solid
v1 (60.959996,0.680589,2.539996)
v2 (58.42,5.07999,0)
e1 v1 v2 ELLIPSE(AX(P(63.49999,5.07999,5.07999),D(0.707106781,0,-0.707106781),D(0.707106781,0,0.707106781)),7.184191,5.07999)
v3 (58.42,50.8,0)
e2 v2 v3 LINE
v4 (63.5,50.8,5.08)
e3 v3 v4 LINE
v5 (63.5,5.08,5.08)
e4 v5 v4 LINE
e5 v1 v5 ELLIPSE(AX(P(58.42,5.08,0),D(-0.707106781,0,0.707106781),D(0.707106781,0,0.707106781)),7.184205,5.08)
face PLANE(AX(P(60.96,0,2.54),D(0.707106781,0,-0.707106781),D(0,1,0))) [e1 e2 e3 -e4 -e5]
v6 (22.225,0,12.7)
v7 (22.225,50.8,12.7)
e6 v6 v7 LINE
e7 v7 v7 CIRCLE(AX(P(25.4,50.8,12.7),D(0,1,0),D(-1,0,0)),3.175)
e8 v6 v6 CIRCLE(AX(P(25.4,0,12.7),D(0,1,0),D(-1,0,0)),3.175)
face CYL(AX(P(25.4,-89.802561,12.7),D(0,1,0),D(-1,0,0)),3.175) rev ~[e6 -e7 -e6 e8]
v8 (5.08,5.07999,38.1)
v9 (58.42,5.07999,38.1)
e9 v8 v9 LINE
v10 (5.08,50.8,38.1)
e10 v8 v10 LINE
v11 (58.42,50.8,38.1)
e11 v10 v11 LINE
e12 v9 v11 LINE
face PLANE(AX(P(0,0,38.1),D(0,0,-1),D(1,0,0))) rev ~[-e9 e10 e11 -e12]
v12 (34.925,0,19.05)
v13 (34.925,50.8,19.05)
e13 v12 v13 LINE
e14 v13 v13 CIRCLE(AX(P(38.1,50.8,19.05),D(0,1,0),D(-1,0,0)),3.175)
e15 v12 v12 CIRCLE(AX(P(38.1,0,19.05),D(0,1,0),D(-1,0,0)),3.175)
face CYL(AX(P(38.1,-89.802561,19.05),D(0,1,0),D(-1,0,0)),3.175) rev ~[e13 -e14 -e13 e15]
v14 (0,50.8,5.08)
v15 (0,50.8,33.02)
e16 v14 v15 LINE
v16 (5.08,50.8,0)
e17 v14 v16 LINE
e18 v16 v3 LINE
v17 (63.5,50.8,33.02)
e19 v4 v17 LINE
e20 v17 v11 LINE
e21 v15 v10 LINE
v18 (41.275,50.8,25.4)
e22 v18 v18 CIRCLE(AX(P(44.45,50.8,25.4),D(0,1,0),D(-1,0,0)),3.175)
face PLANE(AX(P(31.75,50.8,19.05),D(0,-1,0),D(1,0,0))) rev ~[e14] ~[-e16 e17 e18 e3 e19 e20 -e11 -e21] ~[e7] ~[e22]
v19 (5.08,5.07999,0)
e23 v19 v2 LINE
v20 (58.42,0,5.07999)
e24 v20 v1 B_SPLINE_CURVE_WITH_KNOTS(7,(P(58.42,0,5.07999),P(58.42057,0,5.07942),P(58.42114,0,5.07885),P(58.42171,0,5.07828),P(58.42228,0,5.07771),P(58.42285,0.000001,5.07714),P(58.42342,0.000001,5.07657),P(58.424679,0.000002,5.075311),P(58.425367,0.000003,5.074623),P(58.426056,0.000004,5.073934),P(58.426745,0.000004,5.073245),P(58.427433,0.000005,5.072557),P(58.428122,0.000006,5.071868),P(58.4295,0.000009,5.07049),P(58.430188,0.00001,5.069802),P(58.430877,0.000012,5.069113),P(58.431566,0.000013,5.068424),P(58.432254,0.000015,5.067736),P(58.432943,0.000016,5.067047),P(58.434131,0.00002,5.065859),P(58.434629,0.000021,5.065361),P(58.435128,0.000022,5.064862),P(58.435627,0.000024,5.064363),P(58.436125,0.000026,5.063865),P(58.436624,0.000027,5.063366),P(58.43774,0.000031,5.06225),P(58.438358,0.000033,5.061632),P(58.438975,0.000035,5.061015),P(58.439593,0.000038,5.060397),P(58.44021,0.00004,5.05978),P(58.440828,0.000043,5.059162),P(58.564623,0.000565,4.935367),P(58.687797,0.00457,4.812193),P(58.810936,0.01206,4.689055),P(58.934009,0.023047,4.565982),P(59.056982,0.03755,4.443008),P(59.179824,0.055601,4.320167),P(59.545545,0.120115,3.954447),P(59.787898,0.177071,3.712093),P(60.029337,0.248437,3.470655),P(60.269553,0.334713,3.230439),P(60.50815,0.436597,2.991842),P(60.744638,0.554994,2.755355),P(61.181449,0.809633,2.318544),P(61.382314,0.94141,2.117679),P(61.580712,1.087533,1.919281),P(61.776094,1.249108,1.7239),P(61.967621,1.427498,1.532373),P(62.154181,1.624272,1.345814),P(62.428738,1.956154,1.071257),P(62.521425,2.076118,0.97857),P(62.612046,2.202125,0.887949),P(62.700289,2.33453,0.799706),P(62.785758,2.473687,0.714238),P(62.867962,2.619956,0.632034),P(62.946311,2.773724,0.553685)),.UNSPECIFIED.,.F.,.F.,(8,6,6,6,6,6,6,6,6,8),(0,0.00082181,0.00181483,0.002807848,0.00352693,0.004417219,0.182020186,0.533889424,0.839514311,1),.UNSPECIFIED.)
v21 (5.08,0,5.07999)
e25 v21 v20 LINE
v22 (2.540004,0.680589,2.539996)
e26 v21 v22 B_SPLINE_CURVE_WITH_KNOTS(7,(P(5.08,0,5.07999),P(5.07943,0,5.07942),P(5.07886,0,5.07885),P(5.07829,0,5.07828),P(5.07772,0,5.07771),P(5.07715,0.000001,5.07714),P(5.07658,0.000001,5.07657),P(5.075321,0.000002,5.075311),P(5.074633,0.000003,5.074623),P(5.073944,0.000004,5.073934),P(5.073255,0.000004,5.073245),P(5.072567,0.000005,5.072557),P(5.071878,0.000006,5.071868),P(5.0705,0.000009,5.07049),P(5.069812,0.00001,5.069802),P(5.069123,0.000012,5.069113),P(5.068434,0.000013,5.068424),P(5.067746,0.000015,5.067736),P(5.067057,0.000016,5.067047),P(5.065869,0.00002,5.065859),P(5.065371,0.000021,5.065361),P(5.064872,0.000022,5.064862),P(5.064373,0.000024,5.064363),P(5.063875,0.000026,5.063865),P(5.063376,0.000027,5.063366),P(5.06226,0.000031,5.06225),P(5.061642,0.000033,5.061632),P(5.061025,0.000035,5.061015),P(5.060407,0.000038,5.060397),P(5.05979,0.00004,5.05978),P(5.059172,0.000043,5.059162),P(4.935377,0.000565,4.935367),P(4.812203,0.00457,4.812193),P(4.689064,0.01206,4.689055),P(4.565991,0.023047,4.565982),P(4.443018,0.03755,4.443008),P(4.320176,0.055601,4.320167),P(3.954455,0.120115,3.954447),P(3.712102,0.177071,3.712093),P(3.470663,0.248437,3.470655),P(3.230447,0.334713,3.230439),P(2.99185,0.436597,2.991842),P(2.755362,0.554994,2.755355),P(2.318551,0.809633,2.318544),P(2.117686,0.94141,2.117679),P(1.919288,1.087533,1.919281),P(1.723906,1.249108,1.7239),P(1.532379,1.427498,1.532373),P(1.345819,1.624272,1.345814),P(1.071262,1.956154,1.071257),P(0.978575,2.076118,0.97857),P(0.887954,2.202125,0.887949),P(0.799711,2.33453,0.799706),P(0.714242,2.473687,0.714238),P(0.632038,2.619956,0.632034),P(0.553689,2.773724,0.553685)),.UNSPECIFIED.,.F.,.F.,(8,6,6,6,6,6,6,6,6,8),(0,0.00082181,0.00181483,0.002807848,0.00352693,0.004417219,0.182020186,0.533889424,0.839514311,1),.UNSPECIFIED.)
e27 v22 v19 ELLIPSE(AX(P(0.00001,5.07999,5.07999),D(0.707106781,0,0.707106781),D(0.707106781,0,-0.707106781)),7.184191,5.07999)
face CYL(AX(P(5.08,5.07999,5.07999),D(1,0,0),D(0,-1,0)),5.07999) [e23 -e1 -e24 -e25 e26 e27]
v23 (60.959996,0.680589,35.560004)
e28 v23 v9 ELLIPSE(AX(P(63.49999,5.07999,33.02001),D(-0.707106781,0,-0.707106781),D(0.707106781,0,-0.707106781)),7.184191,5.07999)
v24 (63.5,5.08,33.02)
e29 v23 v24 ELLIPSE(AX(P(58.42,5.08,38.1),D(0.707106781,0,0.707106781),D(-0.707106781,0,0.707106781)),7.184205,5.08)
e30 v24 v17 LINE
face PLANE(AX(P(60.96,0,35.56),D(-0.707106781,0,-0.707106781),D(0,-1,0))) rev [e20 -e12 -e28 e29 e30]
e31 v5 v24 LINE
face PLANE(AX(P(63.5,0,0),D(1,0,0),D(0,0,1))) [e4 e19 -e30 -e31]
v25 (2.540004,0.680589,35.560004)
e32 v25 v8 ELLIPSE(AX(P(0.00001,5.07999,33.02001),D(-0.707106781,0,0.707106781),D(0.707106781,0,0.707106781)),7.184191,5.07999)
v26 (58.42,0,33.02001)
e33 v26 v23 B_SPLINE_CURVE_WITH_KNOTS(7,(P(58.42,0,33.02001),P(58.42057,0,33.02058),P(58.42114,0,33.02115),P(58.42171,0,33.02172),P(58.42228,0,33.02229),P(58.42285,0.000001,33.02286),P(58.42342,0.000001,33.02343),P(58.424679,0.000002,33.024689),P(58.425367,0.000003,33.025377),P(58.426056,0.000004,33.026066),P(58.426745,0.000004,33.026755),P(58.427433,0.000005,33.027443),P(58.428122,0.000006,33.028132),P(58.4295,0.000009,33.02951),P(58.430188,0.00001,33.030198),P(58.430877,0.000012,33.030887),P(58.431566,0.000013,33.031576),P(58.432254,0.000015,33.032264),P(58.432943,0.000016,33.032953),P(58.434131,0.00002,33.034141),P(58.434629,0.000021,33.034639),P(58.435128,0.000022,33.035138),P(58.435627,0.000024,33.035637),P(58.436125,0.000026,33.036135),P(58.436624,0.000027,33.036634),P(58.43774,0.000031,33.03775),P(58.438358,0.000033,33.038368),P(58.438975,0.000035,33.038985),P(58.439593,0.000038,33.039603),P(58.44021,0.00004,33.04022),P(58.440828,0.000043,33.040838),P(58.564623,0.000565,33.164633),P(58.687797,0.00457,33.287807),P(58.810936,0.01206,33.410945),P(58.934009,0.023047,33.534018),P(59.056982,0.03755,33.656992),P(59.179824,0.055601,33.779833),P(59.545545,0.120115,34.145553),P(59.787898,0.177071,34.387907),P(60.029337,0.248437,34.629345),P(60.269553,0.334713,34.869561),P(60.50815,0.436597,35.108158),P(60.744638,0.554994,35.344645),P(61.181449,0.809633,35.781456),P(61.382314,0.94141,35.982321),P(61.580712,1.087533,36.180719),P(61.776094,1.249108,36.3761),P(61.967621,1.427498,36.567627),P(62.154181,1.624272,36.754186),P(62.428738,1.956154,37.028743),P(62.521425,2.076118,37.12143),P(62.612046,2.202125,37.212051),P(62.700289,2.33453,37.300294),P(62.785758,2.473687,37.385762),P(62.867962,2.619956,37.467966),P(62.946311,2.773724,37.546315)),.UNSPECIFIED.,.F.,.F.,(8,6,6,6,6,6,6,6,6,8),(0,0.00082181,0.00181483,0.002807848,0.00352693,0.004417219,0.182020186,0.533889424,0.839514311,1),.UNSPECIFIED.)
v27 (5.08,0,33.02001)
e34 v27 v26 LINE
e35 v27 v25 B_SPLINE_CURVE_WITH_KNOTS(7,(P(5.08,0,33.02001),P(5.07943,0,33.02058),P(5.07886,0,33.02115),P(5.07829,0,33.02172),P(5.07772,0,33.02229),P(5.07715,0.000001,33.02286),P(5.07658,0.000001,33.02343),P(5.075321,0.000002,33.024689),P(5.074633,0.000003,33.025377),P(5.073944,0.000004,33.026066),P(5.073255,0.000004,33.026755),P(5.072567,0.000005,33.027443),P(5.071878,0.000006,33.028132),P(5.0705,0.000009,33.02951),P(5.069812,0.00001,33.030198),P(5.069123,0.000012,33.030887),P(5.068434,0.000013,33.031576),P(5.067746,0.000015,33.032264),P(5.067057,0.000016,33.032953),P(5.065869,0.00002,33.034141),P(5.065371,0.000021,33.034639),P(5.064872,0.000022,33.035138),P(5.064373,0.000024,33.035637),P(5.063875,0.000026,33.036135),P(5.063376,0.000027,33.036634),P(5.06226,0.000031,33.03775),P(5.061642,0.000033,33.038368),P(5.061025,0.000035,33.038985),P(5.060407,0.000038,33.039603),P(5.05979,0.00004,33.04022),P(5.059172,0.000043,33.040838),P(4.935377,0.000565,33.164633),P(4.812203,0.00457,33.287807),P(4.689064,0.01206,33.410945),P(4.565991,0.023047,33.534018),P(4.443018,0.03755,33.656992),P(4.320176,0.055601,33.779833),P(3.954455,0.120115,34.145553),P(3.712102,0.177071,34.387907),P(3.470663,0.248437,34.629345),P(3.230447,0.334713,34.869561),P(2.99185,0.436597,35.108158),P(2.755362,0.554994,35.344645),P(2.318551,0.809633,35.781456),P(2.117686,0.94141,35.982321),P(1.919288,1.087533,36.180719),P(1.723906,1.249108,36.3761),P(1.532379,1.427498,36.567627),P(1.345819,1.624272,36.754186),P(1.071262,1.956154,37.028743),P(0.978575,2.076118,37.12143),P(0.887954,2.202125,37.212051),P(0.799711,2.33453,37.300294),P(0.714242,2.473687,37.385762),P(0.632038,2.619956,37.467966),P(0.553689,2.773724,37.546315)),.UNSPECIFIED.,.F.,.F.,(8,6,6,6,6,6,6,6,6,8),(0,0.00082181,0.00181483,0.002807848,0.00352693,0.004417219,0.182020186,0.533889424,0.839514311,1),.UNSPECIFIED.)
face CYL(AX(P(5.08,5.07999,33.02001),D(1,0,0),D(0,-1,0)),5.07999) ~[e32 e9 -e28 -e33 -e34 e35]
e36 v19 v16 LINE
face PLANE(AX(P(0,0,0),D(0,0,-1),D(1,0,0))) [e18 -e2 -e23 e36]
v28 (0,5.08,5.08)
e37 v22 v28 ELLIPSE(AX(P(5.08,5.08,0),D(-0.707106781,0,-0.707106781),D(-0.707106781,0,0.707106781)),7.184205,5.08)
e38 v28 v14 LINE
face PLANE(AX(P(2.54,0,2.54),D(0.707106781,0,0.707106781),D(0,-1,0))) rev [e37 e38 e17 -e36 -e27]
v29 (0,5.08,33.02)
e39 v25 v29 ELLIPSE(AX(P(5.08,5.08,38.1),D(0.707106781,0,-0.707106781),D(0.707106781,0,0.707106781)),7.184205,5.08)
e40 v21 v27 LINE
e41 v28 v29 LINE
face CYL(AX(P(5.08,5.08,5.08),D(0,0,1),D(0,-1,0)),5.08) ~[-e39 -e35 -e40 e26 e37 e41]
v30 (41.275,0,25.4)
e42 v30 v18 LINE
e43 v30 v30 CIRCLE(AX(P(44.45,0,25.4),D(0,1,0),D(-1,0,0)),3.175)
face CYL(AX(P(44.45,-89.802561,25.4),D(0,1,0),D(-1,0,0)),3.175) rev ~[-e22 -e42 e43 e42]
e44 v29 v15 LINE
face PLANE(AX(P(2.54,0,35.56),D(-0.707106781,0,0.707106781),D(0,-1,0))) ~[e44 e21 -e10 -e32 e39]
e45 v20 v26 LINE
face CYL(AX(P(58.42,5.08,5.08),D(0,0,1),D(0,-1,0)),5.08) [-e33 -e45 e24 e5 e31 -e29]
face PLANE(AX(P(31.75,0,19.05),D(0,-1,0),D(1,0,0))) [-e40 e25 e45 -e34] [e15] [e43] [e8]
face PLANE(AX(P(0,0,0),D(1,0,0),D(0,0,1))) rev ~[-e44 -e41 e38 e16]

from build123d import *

# Parameters (mm, degrees)
F0_W     = 63.5
F0_H     = 38.1
F1_DEPTH = 50.8
F2_SIZE  = 5.08
F3_R     = 5.08
F3_R_2   = 5.07999
F5_D     = 6.35


# Not quite as in the source:
# - a fillet or chamfer is up to 0.001 mm smaller than in the source, because OpenCascade refuses the exact size


with BuildPart() as f1:
    # F0 (on Front) → F1 (new body)
    with BuildSketch(Plane.XZ):
        with Locations((31.75, 19.05)):
            Rectangle(F0_W, F0_H)
    extrude(amount=-F1_DEPTH)

    # F2
    f2_edges = [f1.edges().sort_by_distance(p)[0] for p in [
        (63.5, 25.4, 38.1),
        (0, 25.4, 38.1),
        (63.5, 25.4, 0),
        (0, 25.4, 0),
    ]]
    chamfer(f2_edges, length=F2_SIZE)

    # F3 (call 1 of 4: OpenCascade refuses the feature's edges together)
    f3_edges = [f1.edges().sort_by_distance(p)[0] for p in [
        (63.5, 0, 19.05),
    ]]
    fillet(f3_edges, radius=F3_R)

    # F3#2 (call 2 of 4)
    f3_2_edges = [f1.edges().sort_by_distance(p)[0] for p in [
        (0, 0, 19.05),
    ]]
    fillet(f3_2_edges, radius=F3_R)

    # F3#3 (call 3 of 4) (radius 5.08 in the source; OpenCascade refuses exactly that, so slightly less here)
    f3_3_edges = [f1.edges().sort_by_distance(p)[0] for p in [
        (31.75, 0, 0),
    ]]
    fillet(f3_3_edges, radius=F3_R_2)

    # F3#4 (call 4 of 4) (radius 5.08 in the source; OpenCascade refuses exactly that, so slightly less here)
    f3_4_edges = [f1.edges().sort_by_distance(p)[0] for p in [
        (31.75, 0, 38.1),
    ]]
    fillet(f3_4_edges, radius=F3_R_2)

    # F5 (through all)
    with Locations(Plane.XZ):
        with Locations((25.4, 12.7), (44.45, 25.4), (38.1, 19.05)):
            Hole(F5_D / 2)


solid = f1.part
